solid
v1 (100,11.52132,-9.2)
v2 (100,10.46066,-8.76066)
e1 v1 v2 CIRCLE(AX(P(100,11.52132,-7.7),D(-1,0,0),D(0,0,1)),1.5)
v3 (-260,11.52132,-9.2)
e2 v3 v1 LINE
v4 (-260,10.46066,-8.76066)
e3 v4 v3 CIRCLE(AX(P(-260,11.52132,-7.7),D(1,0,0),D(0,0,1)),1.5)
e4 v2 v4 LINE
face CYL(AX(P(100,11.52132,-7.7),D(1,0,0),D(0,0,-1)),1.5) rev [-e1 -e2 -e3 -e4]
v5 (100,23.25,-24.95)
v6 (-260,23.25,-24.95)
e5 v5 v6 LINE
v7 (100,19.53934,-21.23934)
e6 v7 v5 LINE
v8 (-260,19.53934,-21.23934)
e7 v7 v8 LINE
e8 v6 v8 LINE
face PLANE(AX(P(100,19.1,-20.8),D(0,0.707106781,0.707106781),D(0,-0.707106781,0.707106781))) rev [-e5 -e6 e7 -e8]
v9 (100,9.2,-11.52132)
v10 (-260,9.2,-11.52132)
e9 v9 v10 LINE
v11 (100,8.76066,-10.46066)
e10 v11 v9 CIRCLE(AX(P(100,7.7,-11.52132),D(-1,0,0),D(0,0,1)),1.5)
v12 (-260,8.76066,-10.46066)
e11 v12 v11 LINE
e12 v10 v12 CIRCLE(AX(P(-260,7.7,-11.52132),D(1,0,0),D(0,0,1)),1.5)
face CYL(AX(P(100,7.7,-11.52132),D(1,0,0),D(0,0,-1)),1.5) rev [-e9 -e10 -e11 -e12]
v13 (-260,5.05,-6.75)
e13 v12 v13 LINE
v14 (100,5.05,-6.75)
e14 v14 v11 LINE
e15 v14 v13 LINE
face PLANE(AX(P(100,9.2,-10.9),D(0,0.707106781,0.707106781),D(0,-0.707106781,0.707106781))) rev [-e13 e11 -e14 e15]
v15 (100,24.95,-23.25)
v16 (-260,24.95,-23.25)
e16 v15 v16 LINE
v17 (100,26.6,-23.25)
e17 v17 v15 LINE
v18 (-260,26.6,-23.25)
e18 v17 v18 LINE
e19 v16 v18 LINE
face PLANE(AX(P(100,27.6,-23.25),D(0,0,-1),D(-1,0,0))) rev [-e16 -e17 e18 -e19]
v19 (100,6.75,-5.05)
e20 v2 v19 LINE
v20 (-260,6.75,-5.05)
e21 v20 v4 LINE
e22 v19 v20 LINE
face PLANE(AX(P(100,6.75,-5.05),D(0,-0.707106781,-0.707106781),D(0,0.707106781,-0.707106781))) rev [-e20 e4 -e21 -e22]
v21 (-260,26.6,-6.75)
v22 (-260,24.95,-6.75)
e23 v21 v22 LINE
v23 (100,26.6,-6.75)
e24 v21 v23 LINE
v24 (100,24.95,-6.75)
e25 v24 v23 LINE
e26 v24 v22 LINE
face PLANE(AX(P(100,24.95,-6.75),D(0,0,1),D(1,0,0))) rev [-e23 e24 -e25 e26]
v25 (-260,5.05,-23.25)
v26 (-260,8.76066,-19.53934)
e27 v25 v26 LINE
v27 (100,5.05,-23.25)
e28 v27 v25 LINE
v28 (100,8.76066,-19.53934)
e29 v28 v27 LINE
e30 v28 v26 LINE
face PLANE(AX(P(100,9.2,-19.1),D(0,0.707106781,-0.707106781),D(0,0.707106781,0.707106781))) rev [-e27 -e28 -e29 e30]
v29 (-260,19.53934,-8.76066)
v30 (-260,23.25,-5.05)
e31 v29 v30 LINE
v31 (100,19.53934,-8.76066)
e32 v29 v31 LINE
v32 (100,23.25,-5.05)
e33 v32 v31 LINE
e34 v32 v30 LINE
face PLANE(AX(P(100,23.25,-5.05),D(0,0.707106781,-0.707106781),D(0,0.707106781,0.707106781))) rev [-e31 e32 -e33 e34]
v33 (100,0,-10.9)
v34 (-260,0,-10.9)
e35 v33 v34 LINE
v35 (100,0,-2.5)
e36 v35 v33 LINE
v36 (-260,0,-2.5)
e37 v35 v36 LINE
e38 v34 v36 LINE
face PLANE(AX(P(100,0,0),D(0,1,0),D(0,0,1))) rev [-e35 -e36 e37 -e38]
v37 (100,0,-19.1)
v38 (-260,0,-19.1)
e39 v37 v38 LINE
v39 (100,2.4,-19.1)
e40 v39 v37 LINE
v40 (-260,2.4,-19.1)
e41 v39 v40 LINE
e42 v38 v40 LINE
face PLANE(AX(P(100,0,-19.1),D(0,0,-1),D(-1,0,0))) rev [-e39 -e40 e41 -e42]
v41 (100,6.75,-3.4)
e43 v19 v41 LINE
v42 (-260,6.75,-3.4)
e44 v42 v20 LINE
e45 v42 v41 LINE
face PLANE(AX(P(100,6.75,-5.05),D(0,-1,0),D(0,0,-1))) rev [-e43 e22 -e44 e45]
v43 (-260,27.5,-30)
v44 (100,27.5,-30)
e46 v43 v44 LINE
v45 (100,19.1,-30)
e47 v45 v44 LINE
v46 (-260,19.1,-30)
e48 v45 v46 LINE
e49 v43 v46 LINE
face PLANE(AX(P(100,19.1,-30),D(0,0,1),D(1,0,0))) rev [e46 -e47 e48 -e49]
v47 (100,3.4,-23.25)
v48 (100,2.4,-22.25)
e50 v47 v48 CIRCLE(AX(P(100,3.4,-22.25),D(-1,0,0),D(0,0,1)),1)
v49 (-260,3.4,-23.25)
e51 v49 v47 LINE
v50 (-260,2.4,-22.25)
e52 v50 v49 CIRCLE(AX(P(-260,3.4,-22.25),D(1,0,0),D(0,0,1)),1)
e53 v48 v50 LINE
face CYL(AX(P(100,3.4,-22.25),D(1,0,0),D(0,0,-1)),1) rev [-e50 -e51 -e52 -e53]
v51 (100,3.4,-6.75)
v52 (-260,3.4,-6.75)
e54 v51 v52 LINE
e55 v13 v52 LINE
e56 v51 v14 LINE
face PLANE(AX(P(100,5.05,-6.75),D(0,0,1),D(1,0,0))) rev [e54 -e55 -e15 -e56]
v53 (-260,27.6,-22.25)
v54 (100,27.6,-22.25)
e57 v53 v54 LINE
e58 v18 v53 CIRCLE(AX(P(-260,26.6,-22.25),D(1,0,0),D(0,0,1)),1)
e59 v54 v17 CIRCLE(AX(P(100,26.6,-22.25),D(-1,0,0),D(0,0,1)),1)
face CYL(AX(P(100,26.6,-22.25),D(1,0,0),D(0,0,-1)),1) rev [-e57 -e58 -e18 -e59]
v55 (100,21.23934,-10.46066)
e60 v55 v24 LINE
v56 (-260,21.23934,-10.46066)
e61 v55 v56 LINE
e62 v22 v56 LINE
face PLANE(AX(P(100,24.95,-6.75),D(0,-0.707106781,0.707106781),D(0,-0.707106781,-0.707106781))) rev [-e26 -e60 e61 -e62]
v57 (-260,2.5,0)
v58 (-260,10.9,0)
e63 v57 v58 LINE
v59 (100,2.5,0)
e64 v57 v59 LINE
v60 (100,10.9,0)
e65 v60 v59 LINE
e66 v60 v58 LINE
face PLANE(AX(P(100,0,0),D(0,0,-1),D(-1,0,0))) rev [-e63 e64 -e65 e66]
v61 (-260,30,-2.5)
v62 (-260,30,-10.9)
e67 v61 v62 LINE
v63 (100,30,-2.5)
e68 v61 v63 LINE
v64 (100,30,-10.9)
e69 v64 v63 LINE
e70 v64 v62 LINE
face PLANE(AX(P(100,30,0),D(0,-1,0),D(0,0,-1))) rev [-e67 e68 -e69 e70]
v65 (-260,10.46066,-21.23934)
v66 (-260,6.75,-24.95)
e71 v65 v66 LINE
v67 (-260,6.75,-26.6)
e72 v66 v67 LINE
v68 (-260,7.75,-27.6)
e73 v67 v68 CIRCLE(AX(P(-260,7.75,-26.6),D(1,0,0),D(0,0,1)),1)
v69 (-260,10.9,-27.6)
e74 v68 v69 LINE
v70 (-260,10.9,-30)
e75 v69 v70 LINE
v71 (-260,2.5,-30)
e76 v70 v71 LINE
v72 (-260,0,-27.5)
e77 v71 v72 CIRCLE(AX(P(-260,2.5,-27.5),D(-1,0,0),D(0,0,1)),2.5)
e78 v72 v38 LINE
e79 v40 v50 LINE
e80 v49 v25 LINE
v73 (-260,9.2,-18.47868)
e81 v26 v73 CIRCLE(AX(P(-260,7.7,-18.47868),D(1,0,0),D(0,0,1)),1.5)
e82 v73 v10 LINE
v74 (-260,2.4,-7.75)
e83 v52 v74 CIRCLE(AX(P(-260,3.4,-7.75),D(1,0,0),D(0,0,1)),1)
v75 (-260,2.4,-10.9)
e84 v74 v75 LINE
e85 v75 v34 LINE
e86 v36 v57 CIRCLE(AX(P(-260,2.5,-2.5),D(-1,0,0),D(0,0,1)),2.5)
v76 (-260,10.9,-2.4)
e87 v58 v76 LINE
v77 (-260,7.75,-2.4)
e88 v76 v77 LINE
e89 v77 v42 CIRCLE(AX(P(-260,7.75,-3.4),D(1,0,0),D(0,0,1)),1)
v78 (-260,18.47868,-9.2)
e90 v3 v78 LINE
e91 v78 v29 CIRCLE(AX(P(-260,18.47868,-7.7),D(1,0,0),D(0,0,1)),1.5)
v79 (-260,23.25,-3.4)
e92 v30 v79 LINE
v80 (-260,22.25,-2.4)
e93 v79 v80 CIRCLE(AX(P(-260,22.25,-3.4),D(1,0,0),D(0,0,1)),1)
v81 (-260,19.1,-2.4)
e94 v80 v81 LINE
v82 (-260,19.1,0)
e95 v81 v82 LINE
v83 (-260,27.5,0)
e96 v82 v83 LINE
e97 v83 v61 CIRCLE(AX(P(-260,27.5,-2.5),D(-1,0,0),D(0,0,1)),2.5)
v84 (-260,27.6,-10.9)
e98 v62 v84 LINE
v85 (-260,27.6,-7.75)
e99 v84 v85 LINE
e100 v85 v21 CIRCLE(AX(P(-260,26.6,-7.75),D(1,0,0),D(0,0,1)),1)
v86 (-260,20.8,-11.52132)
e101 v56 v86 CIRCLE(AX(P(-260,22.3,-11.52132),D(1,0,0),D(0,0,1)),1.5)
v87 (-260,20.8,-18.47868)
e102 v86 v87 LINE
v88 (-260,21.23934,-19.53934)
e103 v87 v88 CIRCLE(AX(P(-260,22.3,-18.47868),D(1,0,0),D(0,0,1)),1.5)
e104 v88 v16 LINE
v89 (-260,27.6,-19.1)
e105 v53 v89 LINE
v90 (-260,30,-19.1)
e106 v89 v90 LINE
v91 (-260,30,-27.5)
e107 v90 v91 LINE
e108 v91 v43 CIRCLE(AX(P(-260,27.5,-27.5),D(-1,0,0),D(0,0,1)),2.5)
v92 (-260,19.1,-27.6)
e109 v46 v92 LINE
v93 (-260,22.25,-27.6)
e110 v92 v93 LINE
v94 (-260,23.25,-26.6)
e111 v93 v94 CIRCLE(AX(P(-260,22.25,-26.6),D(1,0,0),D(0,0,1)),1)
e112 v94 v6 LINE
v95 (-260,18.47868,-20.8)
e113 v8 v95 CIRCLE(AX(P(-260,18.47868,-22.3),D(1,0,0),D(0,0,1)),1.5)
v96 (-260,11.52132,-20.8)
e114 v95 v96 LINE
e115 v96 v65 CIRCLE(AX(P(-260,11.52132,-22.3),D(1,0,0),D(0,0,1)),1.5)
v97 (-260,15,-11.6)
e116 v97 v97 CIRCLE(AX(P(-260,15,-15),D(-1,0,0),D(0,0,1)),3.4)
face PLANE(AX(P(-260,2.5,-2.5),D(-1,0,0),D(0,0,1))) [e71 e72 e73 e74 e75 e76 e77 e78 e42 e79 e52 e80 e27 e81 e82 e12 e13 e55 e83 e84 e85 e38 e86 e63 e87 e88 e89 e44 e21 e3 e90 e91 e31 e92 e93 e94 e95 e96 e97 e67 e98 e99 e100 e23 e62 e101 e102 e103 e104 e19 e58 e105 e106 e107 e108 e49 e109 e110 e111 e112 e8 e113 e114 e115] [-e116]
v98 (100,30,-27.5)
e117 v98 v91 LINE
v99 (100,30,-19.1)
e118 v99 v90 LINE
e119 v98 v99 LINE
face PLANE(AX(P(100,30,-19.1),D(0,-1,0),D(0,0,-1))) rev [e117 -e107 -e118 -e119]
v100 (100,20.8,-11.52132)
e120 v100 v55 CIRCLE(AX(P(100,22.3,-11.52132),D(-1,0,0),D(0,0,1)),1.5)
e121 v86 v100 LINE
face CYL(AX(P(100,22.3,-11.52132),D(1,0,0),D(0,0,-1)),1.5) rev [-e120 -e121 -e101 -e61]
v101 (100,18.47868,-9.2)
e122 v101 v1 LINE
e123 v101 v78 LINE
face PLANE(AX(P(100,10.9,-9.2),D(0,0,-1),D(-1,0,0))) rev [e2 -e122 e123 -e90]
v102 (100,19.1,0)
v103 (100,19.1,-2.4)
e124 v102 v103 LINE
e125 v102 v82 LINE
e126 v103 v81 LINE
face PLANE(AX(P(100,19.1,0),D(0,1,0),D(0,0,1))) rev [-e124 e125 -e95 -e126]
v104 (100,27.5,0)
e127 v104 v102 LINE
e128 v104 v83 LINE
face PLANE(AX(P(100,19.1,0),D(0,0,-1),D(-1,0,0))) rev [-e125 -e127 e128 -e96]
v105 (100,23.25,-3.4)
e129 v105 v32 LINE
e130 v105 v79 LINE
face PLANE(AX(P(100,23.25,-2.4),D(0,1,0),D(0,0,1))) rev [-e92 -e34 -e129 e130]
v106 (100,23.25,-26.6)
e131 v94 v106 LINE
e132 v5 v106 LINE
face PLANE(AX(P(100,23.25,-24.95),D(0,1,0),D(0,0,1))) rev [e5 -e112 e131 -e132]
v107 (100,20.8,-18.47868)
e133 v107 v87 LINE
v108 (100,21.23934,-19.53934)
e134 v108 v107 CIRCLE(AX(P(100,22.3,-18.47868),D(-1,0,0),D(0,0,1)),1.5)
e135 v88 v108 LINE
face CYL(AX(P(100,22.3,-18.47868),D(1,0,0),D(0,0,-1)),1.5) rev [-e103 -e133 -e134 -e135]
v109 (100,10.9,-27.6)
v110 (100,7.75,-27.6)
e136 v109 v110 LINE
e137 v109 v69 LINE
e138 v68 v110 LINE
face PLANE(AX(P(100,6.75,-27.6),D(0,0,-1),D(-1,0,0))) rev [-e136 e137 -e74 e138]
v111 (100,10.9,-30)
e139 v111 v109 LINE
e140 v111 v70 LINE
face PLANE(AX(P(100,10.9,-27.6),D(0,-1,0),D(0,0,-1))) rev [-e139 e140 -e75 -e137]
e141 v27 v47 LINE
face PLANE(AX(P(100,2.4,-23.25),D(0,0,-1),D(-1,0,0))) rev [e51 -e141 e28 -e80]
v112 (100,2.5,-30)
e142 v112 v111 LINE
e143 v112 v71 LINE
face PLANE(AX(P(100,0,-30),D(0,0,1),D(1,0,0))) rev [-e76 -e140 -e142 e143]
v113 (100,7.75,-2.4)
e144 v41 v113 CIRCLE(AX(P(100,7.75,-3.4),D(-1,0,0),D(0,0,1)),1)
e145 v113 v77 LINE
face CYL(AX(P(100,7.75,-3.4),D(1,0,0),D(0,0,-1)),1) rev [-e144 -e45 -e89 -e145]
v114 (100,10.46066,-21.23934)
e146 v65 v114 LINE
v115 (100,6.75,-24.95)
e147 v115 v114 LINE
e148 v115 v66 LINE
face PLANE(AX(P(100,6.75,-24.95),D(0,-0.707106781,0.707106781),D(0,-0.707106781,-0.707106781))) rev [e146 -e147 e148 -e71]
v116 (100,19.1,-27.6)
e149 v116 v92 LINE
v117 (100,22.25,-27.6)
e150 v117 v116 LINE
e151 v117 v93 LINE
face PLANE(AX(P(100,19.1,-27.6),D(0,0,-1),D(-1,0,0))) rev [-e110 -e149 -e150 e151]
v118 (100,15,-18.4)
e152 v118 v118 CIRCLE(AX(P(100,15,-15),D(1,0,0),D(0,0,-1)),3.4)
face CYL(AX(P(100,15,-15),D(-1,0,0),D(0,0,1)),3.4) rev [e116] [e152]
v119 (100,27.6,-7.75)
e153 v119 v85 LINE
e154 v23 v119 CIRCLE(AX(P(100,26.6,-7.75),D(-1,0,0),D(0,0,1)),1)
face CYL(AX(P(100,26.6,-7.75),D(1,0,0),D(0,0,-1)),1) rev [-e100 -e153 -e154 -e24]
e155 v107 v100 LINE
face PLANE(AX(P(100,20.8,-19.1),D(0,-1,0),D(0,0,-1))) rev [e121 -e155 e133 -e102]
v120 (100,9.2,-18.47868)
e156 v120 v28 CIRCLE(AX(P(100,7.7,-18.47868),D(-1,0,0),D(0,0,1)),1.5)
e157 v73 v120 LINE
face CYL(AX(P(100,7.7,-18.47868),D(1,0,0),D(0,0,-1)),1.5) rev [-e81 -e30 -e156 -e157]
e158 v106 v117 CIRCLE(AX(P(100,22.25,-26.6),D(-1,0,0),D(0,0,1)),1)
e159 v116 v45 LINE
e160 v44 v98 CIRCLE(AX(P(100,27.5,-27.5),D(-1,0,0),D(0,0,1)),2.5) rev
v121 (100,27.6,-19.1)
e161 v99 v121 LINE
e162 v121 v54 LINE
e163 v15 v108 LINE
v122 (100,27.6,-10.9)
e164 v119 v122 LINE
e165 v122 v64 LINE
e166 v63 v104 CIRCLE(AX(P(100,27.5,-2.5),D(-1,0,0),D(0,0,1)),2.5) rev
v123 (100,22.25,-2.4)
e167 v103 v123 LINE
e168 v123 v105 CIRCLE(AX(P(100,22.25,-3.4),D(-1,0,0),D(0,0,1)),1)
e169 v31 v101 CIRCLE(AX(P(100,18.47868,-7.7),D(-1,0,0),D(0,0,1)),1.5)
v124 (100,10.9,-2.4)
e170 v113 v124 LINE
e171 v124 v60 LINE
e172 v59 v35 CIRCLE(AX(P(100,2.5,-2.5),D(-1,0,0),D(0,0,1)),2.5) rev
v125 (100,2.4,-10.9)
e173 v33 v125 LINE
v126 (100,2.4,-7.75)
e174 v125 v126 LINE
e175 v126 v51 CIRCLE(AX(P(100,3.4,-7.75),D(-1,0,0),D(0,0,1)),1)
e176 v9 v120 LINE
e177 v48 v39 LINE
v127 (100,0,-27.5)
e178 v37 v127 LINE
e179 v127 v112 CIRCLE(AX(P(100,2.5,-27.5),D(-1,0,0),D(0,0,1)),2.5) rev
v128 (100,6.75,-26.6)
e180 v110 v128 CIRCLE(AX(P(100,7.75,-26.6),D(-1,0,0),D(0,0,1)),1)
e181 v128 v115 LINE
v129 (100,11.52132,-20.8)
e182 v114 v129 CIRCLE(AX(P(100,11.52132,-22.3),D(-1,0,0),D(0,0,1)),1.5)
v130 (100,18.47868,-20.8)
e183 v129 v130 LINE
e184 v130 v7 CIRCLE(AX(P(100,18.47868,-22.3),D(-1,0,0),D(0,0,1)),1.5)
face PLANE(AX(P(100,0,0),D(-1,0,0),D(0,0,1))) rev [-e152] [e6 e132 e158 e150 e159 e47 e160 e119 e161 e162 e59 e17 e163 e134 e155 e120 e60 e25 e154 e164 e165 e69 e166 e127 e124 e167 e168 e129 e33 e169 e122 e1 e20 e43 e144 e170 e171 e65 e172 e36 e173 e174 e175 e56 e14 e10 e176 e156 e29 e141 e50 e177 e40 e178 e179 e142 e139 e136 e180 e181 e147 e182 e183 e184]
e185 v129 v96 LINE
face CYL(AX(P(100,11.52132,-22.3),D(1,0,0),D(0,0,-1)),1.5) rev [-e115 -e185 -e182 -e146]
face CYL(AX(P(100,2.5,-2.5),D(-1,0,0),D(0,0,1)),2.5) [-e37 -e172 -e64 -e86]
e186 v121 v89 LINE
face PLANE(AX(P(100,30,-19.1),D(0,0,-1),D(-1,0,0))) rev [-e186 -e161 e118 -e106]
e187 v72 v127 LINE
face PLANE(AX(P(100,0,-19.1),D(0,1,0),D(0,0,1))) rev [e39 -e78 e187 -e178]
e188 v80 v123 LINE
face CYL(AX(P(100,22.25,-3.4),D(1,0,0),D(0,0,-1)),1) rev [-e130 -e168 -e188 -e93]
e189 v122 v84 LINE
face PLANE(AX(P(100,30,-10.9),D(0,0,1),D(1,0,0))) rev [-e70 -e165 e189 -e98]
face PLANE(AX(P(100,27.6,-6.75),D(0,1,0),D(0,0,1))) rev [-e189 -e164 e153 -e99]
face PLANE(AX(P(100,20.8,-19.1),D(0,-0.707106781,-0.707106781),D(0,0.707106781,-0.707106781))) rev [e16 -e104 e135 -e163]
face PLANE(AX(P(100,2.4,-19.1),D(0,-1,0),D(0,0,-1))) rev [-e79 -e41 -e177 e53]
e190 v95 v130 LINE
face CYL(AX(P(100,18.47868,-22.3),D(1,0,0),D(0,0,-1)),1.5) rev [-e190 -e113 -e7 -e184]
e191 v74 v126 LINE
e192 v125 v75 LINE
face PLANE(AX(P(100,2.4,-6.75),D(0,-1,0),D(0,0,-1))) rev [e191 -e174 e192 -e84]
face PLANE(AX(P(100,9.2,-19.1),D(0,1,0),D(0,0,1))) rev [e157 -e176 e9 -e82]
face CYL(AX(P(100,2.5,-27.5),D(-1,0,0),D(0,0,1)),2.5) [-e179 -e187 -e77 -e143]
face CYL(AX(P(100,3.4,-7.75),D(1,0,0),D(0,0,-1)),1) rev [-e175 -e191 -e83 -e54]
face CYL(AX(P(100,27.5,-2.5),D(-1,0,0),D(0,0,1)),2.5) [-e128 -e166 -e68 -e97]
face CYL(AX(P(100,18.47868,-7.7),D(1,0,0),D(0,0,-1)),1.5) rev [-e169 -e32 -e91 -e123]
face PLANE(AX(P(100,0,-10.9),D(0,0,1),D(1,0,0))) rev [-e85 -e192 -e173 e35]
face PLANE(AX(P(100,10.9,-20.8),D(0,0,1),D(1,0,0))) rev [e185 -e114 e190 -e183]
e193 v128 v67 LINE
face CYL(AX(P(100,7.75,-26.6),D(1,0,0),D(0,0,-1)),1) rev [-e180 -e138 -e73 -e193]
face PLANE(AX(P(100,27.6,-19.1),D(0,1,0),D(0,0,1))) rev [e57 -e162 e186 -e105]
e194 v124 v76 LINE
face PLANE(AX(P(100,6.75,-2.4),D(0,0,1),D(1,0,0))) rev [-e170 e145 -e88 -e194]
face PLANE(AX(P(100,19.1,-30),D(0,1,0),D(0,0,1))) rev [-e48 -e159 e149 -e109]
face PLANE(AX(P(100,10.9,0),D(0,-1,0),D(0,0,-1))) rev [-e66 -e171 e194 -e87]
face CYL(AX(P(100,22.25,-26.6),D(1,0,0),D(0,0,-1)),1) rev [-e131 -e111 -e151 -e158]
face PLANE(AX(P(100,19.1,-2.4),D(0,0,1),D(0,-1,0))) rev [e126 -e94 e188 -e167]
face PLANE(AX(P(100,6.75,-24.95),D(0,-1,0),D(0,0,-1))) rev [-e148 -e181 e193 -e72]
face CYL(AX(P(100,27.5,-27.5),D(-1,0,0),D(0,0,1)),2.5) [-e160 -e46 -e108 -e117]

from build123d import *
from build123d.topology import SkipClean

# Parameters (mm, degrees)
SKETCH1_R           = 3.4
BOSS_EXTRUDE2_DEPTH = 100
FILLET5_R           = 2.5
FILLET6_R           = 1.5
FILLET7_R           = 1.5
FILLET8_R           = 1
SKETCH3_R           = 3.4
BOSS_EXTRUDE3_DEPTH = 140
SKETCH7_R           = 3.4
BOSS_EXTRUDE4_DEPTH = 120


with BuildPart() as part:
    # Sketch1 → Boss-Extrude2 (new body)
    with BuildSketch(Plane(origin=(0, 0, 0), x_dir=(0, 0, -1), z_dir=(1, 0, 0))):
        Polygon((10.9, 0), (10.9, 2.4), (6.75, 2.4), (6.75, 5.05), (10.9, 9.2), (19.1, 9.2), (23.25, 5.05), (23.25, 2.4), (19.1, 2.4), (19.1, 0), (30, 0), (30, 10.9), (27.6, 10.9), (27.6, 6.75), (24.95, 6.75), (20.8, 10.9), (20.8, 19.1), (24.95, 23.25), (27.6, 23.25), (27.6, 19.1), (30, 19.1), (30, 30), (19.1, 30), (19.1, 27.6), (23.25, 27.6), (23.25, 24.95), (19.1, 20.8), (10.9, 20.8), (6.75, 24.95), (6.75, 27.6), (10.9, 27.6), (10.9, 30), (0, 30), (0, 19.1), (2.4, 19.1), (2.4, 23.25), (5.05, 23.25), (9.2, 19.1), (9.2, 10.9), (5.05, 6.75), (2.4, 6.75), (2.4, 10.9), (0, 10.9), (0, 0), align=None)
        with Locations((15, 15)):
            Circle(SKETCH1_R, mode=Mode.SUBTRACT)
    extrude(amount=BOSS_EXTRUDE2_DEPTH)

    # Fillet5
    fillet5_edges = [part.edges().sort_by_distance(p)[0] for p in [
        (50, 30, 0),
        (50, 30, -30),
        (50, 0, -30),
        (50, 0, 0),
    ]]
    fillet(fillet5_edges, radius=FILLET5_R)

    # Fillet6
    fillet6_edges = [part.edges().sort_by_distance(p)[0] for p in [
        (50, 10.9, -9.2),
        (50, 19.1, -9.2),
        (50, 19.1, -20.8),
        (50, 10.9, -20.8),
        (50, 9.2, -19.1),
        (50, 9.2, -10.9),
    ]]
    fillet(fillet6_edges, radius=FILLET6_R)

    # Fillet7
    fillet7_edges = [part.edges().sort_by_distance(p)[0] for p in [
        (50, 20.8, -10.9),
        (50, 20.8, -19.1),
    ]]
    fillet(fillet7_edges, radius=FILLET7_R)

    # Fillet8
    fillet8_edges = [part.edges().sort_by_distance(p)[0] for p in [
        (50, 6.75, -2.4),
        (50, 23.25, -2.4),
        (50, 27.6, -6.75),
        (50, 27.6, -23.25),
        (50, 23.25, -27.6),
        (50, 6.75, -27.6),
        (50, 2.4, -23.25),
        (50, 2.4, -6.75),
    ]]
    fillet(fillet8_edges, radius=FILLET8_R)

    # Sketch3 → Boss-Extrude3 (add)
    with BuildSketch(Plane(origin=(0, 0, 0), x_dir=(0, 0, -1), z_dir=(1, 0, 0))):
        with BuildLine():
            Line((10.9, 27.6), (10.9, 30))
            Line((10.9, 30), (2.5, 30))
            ThreePointArc((2.5, 30), (0.732233047, 29.267766953), (0, 27.5))
            Line((0, 27.5), (0, 19.1))
            Line((0, 19.1), (2.4, 19.1))
            Line((2.4, 19.1), (2.4, 22.25))
            ThreePointArc((2.4, 22.25), (2.692893219, 22.957106781), (3.4, 23.25))
            Line((3.4, 23.25), (5.05, 23.25))
            Line((5.05, 23.25), (8.760660172, 19.539339828))
            ThreePointArc((8.760660172, 19.539339828), (9.085819299, 19.052704805), (9.2, 18.478679656))
            Line((9.2, 18.478679656), (9.2, 11.521320344))
            ThreePointArc((9.2, 11.521320344), (9.085819299, 10.947295195), (8.760660172, 10.460660172))
            Line((8.760660172, 10.460660172), (5.05, 6.75))
            Line((5.05, 6.75), (3.4, 6.75))
            ThreePointArc((3.4, 6.75), (2.692893219, 7.042893219), (2.4, 7.75))
            Line((2.4, 7.75), (2.4, 10.9))
            Line((2.4, 10.9), (0, 10.9))
            Line((0, 10.9), (0, 2.5))
            ThreePointArc((0, 2.5), (0.732233047, 0.732233047), (2.5, 0))
            Line((2.5, 0), (10.9, 0))
            Line((10.9, 0), (10.9, 2.4))
            Line((10.9, 2.4), (7.75, 2.4))
            ThreePointArc((7.75, 2.4), (7.042893219, 2.692893219), (6.75, 3.4))
            Line((6.75, 3.4), (6.75, 5.05))
            Line((6.75, 5.05), (10.460660172, 8.760660172))
            ThreePointArc((10.460660172, 8.760660172), (10.947295195, 9.085819299), (11.521320344, 9.2))
            Line((11.521320344, 9.2), (18.478679656, 9.2))
            ThreePointArc((18.478679656, 9.2), (19.052704805, 9.085819299), (19.539339828, 8.760660172))
            Line((19.539339828, 8.760660172), (23.25, 5.05))
            Line((23.25, 5.05), (23.25, 3.4))
            ThreePointArc((23.25, 3.4), (22.957106781, 2.692893219), (22.25, 2.4))
            Line((22.25, 2.4), (19.1, 2.4))
            Line((19.1, 2.4), (19.1, 0))
            Line((19.1, 0), (27.5, 0))
            ThreePointArc((27.5, 0), (29.267766953, 0.732233047), (30, 2.5))
            Line((30, 2.5), (30, 10.9))
            Line((30, 10.9), (27.6, 10.9))
            Line((27.6, 10.9), (27.6, 7.75))
            ThreePointArc((27.6, 7.75), (27.307106781, 7.042893219), (26.6, 6.75))
            Line((26.6, 6.75), (24.95, 6.75))
            Line((24.95, 6.75), (21.239339828, 10.460660172))
            ThreePointArc((21.239339828, 10.460660172), (20.914180701, 10.947295195), (20.8, 11.521320344))
            Line((20.8, 11.521320344), (20.8, 18.478679656))
            ThreePointArc((20.8, 18.478679656), (20.914180701, 19.052704805), (21.239339828, 19.539339828))
            Line((21.239339828, 19.539339828), (24.95, 23.25))
            Line((24.95, 23.25), (26.6, 23.25))
            ThreePointArc((26.6, 23.25), (27.307106781, 22.957106781), (27.6, 22.25))
            Line((27.6, 22.25), (27.6, 19.1))
            Line((27.6, 19.1), (30, 19.1))
            Line((30, 19.1), (30, 27.5))
            ThreePointArc((30, 27.5), (29.267766953, 29.267766953), (27.5, 30))
            Line((27.5, 30), (19.1, 30))
            Line((19.1, 30), (19.1, 27.6))
            Line((19.1, 27.6), (22.25, 27.6))
            ThreePointArc((22.25, 27.6), (22.957106781, 27.307106781), (23.25, 26.6))
            Line((23.25, 26.6), (23.25, 24.95))
            Line((23.25, 24.95), (19.539339828, 21.239339828))
            ThreePointArc((19.539339828, 21.239339828), (19.052704805, 20.914180701), (18.478679656, 20.8))
            Line((18.478679656, 20.8), (11.521320344, 20.8))
            ThreePointArc((11.521320344, 20.8), (10.947295195, 20.914180701), (10.460660172, 21.239339828))
            Line((10.460660172, 21.239339828), (6.75, 24.95))
            Line((6.75, 24.95), (6.75, 26.6))
            ThreePointArc((6.75, 26.6), (7.042893219, 27.307106781), (7.75, 27.6))
            Line((7.75, 27.6), (10.9, 27.6))
        make_face()
        with Locations((15, 15)):
            Circle(SKETCH3_R, mode=Mode.SUBTRACT)
    extrude(amount=-BOSS_EXTRUDE3_DEPTH)

    # Sketch7 → Boss-Extrude4 (add)
    with SkipClean():  # the faces are left unmerged after this step: merging them gives an invalid solid
        with BuildSketch(Plane.ZY.offset(140)):
            with BuildLine():
                Line((-2.4, 10.9), (0, 10.9))
                Line((0, 10.9), (0, 2.5))
                ThreePointArc((0, 2.5), (-0.732233047, 0.732233047), (-2.5, 0))
                Line((-2.5, 0), (-10.9, 0))
                Line((-10.9, 0), (-10.9, 2.4))
                Line((-10.9, 2.4), (-7.75, 2.4))
                ThreePointArc((-7.75, 2.4), (-7.042893219, 2.692893219), (-6.75, 3.4))
                Line((-6.75, 3.4), (-6.75, 5.05))
                Line((-6.75, 5.05), (-10.460660172, 8.760660172))
                ThreePointArc((-10.460660172, 8.760660172), (-10.947295195, 9.085819299), (-11.521320344, 9.2))
                Line((-11.521320344, 9.2), (-18.478679656, 9.2))
                ThreePointArc((-18.478679656, 9.2), (-19.052704805, 9.085819299), (-19.539339828, 8.760660172))
                Line((-19.539339828, 8.760660172), (-23.25, 5.05))
                Line((-23.25, 5.05), (-23.25, 3.4))
                ThreePointArc((-23.25, 3.4), (-22.957106781, 2.692893219), (-22.25, 2.4))
                Line((-22.25, 2.4), (-19.1, 2.4))
                Line((-19.1, 2.4), (-19.1, 0))
                Line((-19.1, 0), (-27.5, 0))
                ThreePointArc((-27.5, 0), (-29.267766953, 0.732233047), (-30, 2.5))
                Line((-30, 2.5), (-30, 10.9))
                Line((-30, 10.9), (-27.6, 10.9))
                Line((-27.6, 10.9), (-27.6, 7.75))
                ThreePointArc((-27.6, 7.75), (-27.307106781, 7.042893219), (-26.6, 6.75))
                Line((-26.6, 6.75), (-24.95, 6.75))
                Line((-24.95, 6.75), (-21.239339828, 10.460660172))
                ThreePointArc((-21.239339828, 10.460660172), (-20.914180701, 10.947295195), (-20.8, 11.521320344))
                Line((-20.8, 11.521320344), (-20.8, 18.478679656))
                ThreePointArc((-20.8, 18.478679656), (-20.914180701, 19.052704805), (-21.239339828, 19.539339828))
                Line((-21.239339828, 19.539339828), (-24.95, 23.25))
                Line((-24.95, 23.25), (-26.6, 23.25))
                ThreePointArc((-26.6, 23.25), (-27.307106781, 22.957106781), (-27.6, 22.25))
                Line((-27.6, 22.25), (-27.6, 19.1))
                Line((-27.6, 19.1), (-30, 19.1))
                Line((-30, 19.1), (-30, 27.5))
                ThreePointArc((-30, 27.5), (-29.267766953, 29.267766953), (-27.5, 30))
                Line((-27.5, 30), (-19.1, 30))
                Line((-19.1, 30), (-19.1, 27.6))
                Line((-19.1, 27.6), (-22.25, 27.6))
                ThreePointArc((-22.25, 27.6), (-22.957106781, 27.307106781), (-23.25, 26.6))
                Line((-23.25, 26.6), (-23.25, 24.95))
                Line((-23.25, 24.95), (-19.539339828, 21.239339828))
                ThreePointArc((-19.539339828, 21.239339828), (-19.052704805, 20.914180701), (-18.478679656, 20.8))
                Line((-18.478679656, 20.8), (-11.521320344, 20.8))
                ThreePointArc((-11.521320344, 20.8), (-10.947295195, 20.914180701), (-10.460660172, 21.239339828))
                Line((-10.460660172, 21.239339828), (-6.75, 24.95))
                Line((-6.75, 24.95), (-6.75, 26.6))
                ThreePointArc((-6.75, 26.6), (-7.042893219, 27.307106781), (-7.75, 27.6))
                Line((-7.75, 27.6), (-10.9, 27.6))
                Line((-10.9, 27.6), (-10.9, 30))
                Line((-10.9, 30), (-2.5, 30))
                ThreePointArc((-2.5, 30), (-0.732233047, 29.267766953), (0, 27.5))
                Line((0, 27.5), (0, 19.1))
                Line((0, 19.1), (-2.4, 19.1))
                Line((-2.4, 19.1), (-2.4, 22.25))
                ThreePointArc((-2.4, 22.25), (-2.692893219, 22.957106781), (-3.4, 23.25))
                Line((-3.4, 23.25), (-5.05, 23.25))
                Line((-5.05, 23.25), (-8.760660172, 19.539339828))
                ThreePointArc((-8.760660172, 19.539339828), (-9.085819299, 19.052704805), (-9.2, 18.478679656))
                Line((-9.2, 18.478679656), (-9.2, 11.521320344))
                ThreePointArc((-9.2, 11.521320344), (-9.085819299, 10.947295195), (-8.760660172, 10.460660172))
                Line((-8.760660172, 10.460660172), (-5.05, 6.75))
                Line((-5.05, 6.75), (-3.4, 6.75))
                ThreePointArc((-3.4, 6.75), (-2.692893219, 7.042893219), (-2.4, 7.75))
                Line((-2.4, 7.75), (-2.4, 10.9))
            make_face()
            with Locations((-15, 15)):
                Circle(SKETCH7_R, mode=Mode.SUBTRACT)
        extrude(amount=BOSS_EXTRUDE4_DEPTH)
    add(part.part.scale(1), mode=Mode.REPLACE)  # the faces are merged on a copy


solid = part.part
